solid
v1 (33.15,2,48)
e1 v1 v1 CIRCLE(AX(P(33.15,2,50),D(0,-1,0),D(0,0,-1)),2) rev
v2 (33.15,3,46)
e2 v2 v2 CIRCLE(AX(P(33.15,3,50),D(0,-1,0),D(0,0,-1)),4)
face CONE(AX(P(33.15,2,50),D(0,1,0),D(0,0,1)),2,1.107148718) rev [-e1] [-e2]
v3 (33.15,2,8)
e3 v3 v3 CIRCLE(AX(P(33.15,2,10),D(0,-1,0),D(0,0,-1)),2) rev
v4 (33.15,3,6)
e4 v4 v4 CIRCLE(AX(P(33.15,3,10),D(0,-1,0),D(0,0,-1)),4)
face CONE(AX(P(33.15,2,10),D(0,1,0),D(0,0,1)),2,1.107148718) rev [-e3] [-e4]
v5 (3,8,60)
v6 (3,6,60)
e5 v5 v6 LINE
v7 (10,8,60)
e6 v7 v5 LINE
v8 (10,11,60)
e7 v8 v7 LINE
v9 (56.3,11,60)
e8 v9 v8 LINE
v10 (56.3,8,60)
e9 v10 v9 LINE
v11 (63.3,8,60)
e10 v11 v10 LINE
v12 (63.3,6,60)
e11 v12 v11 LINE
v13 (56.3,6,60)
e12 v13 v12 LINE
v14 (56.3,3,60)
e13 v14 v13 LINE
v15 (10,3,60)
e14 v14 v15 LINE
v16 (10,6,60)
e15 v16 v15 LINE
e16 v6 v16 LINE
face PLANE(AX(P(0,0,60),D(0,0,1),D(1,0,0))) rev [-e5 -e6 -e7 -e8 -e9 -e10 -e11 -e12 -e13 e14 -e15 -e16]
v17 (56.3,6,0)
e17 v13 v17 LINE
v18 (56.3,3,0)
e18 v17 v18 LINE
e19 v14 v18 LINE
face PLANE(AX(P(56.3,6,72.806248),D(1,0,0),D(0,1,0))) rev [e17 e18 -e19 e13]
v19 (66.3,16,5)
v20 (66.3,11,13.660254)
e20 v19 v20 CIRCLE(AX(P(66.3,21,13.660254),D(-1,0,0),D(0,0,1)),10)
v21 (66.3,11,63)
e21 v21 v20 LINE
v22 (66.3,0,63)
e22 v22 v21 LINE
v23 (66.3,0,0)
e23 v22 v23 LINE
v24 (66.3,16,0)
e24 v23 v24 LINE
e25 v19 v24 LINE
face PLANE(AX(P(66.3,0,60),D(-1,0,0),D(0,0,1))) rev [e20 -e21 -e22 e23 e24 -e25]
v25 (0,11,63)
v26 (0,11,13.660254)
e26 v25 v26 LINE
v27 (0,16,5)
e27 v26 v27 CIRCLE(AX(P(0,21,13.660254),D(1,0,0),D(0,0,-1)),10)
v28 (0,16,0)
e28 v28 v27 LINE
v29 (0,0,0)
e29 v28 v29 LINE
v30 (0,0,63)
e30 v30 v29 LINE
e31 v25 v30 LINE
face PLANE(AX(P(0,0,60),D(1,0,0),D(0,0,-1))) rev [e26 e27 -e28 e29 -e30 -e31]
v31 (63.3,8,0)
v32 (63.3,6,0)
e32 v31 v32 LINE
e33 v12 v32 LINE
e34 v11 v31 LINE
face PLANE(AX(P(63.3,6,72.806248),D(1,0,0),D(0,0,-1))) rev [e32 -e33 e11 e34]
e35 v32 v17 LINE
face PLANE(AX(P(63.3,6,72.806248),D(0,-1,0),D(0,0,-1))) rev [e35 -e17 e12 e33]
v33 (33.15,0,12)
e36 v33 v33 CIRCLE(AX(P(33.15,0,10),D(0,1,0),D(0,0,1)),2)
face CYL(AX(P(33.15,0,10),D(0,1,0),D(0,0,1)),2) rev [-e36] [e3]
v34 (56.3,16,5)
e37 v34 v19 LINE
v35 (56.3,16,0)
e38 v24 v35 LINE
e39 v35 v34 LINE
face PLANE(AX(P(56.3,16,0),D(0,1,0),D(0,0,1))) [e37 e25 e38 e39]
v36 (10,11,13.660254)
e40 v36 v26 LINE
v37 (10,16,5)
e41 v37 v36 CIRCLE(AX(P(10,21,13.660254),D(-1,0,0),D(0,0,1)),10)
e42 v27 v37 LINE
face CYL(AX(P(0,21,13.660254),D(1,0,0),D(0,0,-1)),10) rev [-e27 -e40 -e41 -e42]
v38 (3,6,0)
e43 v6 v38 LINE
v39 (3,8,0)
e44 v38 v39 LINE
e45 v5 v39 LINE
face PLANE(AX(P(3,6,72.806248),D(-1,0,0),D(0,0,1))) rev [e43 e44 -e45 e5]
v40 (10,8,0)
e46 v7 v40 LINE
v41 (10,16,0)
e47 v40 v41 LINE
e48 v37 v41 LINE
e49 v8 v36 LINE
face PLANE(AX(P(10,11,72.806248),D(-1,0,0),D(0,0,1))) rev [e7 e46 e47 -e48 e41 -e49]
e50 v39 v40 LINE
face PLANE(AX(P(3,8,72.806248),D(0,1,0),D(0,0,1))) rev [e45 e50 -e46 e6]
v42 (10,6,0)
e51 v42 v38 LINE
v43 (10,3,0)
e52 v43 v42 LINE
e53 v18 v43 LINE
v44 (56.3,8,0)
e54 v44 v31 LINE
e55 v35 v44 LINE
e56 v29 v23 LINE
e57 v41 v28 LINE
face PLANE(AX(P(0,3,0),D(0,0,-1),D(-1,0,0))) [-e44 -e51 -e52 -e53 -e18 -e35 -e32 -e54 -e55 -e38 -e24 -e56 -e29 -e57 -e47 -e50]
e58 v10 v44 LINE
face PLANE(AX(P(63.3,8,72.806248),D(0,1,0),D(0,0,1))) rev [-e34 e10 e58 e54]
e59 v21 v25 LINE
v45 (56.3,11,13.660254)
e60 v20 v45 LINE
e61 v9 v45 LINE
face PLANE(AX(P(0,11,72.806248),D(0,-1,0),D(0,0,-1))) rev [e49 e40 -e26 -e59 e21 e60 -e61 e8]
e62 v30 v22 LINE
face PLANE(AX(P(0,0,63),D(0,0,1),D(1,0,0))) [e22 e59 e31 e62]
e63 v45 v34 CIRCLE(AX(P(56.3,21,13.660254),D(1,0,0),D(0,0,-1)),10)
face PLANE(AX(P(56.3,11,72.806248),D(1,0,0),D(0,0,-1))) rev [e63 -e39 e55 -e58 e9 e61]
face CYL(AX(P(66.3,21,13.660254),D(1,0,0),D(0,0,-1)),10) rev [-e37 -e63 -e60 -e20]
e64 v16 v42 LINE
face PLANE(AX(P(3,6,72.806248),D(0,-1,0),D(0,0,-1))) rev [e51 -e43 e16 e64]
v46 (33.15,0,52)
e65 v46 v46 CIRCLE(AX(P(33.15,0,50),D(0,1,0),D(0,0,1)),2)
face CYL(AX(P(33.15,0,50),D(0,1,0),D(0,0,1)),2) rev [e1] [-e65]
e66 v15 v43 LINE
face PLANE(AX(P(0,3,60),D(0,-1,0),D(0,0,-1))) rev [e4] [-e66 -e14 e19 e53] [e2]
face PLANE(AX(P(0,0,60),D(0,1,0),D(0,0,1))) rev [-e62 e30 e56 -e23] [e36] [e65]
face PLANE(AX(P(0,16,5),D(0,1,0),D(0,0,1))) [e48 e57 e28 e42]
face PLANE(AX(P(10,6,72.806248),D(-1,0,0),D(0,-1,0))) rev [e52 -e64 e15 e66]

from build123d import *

# Parameters (mm, degrees)
SKETCH_1_W      = 66.3
SKETCH_1_H      = 3
BASE_DEPTH      = 60
RAILS_DEPTH     = 60
SKETCH_3_R      = 2
HOLES_DEPTH     = 90.775776243
CHAMFER_1_SIZE  = 2
CHAMFER_1_SIZE2 = 1
SKETCH_4_W      = 66.3
SKETCH_4_H      = 11
FLOOR_2_DEPTH   = 3
SKETCH_5_W      = 10
SKETCH_5_H      = 5
EXTRUDE_1_DEPTH = 5
FILLET_1_R      = 10


with BuildPart() as part:
    # Эскиз1 → base (new body)
    with BuildSketch(Plane.XY):
        with Locations((33.15, 1.5)):
            Rectangle(SKETCH_1_W, SKETCH_1_H)
    extrude(amount=BASE_DEPTH)

    # Эскиз2 → rails (add)
    with BuildSketch(Plane.XY):
        Polygon((0, 3), (10, 3), (10, 6), (3, 6), (3, 8), (10, 8), (10, 11), (0, 11), align=None)
        Polygon((56.3, 11), (56.3, 8), (63.3, 8), (63.3, 6), (56.3, 6), (56.3, 3), (66.3, 3), (66.3, 11), align=None)
    extrude(amount=RAILS_DEPTH)

    # Эскиз3 → holes (cut, through all)
    with BuildSketch(Plane(origin=(0, 3, 0), x_dir=(1, 0, 0), z_dir=(0, 1, 0))):
        with Locations(Location((33.15, -10, 0), (0, 0, 270))):
            Circle(SKETCH_3_R)
        with Locations(Location((33.15, -50, 0), (0, 0, 270))):
            Circle(SKETCH_3_R)
    extrude(amount=-HOLES_DEPTH, mode=Mode.SUBTRACT)

    # Фаска1
    chamfer_1_edges = [part.edges().sort_by_distance(p)[0] for p in [
        (33.15, 3, 8),
        (33.15, 3, 48),
    ]]
    chamfer_1_side = [part.faces().sort_by_distance(p)[0] for p in [
        (33.15, 3, 30),
    ]]
    chamfer(chamfer_1_edges, length=CHAMFER_1_SIZE, length2=CHAMFER_1_SIZE2, reference=chamfer_1_side[0])

    # Эскиз4 → floor 2 (add)
    with BuildSketch(Plane.XY.offset(60)):
        with Locations((33.15, 5.5)):
            Rectangle(SKETCH_4_W, SKETCH_4_H)
    extrude(amount=FLOOR_2_DEPTH)

    # Эскиз5 → Вытянуть1 (add)
    with BuildSketch(Plane(origin=(0, 11, 0), x_dir=(1, 0, 0), z_dir=(0, 1, 0))):
        with Locations((5, -2.5)):
            Rectangle(SKETCH_5_W, SKETCH_5_H)
        with Locations((61.3, -2.5)):
            Rectangle(SKETCH_5_W, SKETCH_5_H)
    extrude(amount=EXTRUDE_1_DEPTH)

    # Скругление1
    # the kernel refuses this fillet: 10 mm, written as the material it adds along each edge
    with BuildSketch(Plane(origin=(56.3, 11, 5), x_dir=(0, 0, 1), z_dir=(1, 0, 0))) as fillet_1_piece_1:
        with BuildLine():
            CenterArc((8.660254038, -10), FILLET_1_R, 90, 60)
            Line((0, -5), (-0.173205081, -4.9))
            ThreePointArc((-0.173205081, -4.9), (-0.2, -2.5), (-0.2, 0))
            Line((-0.2, 0), (0, 0.2))
            Line((0, 0.2), (8.660254038, 0.2))
            Line((8.660254038, 0.2), (8.660254038, 0))
        make_face()
    extrude(amount=10)
    with BuildSketch(Plane(origin=(10, 11, 5), x_dir=(0, 0, 1), z_dir=(-1, 0, 0))) as fillet_1_piece_2:
        with BuildLine():
            CenterArc((8.660254038, 10), FILLET_1_R, 210, 60)
            Line((0, 5), (-0.173205081, 4.9))
            ThreePointArc((-0.173205081, 4.9), (-0.2, 2.5), (-0.2, 0))
            Line((-0.2, 0), (0, -0.2))
            Line((0, -0.2), (8.660254038, -0.2))
            Line((8.660254038, -0.2), (8.660254038, 0))
        make_face()
    extrude(amount=10)


solid = part.part
